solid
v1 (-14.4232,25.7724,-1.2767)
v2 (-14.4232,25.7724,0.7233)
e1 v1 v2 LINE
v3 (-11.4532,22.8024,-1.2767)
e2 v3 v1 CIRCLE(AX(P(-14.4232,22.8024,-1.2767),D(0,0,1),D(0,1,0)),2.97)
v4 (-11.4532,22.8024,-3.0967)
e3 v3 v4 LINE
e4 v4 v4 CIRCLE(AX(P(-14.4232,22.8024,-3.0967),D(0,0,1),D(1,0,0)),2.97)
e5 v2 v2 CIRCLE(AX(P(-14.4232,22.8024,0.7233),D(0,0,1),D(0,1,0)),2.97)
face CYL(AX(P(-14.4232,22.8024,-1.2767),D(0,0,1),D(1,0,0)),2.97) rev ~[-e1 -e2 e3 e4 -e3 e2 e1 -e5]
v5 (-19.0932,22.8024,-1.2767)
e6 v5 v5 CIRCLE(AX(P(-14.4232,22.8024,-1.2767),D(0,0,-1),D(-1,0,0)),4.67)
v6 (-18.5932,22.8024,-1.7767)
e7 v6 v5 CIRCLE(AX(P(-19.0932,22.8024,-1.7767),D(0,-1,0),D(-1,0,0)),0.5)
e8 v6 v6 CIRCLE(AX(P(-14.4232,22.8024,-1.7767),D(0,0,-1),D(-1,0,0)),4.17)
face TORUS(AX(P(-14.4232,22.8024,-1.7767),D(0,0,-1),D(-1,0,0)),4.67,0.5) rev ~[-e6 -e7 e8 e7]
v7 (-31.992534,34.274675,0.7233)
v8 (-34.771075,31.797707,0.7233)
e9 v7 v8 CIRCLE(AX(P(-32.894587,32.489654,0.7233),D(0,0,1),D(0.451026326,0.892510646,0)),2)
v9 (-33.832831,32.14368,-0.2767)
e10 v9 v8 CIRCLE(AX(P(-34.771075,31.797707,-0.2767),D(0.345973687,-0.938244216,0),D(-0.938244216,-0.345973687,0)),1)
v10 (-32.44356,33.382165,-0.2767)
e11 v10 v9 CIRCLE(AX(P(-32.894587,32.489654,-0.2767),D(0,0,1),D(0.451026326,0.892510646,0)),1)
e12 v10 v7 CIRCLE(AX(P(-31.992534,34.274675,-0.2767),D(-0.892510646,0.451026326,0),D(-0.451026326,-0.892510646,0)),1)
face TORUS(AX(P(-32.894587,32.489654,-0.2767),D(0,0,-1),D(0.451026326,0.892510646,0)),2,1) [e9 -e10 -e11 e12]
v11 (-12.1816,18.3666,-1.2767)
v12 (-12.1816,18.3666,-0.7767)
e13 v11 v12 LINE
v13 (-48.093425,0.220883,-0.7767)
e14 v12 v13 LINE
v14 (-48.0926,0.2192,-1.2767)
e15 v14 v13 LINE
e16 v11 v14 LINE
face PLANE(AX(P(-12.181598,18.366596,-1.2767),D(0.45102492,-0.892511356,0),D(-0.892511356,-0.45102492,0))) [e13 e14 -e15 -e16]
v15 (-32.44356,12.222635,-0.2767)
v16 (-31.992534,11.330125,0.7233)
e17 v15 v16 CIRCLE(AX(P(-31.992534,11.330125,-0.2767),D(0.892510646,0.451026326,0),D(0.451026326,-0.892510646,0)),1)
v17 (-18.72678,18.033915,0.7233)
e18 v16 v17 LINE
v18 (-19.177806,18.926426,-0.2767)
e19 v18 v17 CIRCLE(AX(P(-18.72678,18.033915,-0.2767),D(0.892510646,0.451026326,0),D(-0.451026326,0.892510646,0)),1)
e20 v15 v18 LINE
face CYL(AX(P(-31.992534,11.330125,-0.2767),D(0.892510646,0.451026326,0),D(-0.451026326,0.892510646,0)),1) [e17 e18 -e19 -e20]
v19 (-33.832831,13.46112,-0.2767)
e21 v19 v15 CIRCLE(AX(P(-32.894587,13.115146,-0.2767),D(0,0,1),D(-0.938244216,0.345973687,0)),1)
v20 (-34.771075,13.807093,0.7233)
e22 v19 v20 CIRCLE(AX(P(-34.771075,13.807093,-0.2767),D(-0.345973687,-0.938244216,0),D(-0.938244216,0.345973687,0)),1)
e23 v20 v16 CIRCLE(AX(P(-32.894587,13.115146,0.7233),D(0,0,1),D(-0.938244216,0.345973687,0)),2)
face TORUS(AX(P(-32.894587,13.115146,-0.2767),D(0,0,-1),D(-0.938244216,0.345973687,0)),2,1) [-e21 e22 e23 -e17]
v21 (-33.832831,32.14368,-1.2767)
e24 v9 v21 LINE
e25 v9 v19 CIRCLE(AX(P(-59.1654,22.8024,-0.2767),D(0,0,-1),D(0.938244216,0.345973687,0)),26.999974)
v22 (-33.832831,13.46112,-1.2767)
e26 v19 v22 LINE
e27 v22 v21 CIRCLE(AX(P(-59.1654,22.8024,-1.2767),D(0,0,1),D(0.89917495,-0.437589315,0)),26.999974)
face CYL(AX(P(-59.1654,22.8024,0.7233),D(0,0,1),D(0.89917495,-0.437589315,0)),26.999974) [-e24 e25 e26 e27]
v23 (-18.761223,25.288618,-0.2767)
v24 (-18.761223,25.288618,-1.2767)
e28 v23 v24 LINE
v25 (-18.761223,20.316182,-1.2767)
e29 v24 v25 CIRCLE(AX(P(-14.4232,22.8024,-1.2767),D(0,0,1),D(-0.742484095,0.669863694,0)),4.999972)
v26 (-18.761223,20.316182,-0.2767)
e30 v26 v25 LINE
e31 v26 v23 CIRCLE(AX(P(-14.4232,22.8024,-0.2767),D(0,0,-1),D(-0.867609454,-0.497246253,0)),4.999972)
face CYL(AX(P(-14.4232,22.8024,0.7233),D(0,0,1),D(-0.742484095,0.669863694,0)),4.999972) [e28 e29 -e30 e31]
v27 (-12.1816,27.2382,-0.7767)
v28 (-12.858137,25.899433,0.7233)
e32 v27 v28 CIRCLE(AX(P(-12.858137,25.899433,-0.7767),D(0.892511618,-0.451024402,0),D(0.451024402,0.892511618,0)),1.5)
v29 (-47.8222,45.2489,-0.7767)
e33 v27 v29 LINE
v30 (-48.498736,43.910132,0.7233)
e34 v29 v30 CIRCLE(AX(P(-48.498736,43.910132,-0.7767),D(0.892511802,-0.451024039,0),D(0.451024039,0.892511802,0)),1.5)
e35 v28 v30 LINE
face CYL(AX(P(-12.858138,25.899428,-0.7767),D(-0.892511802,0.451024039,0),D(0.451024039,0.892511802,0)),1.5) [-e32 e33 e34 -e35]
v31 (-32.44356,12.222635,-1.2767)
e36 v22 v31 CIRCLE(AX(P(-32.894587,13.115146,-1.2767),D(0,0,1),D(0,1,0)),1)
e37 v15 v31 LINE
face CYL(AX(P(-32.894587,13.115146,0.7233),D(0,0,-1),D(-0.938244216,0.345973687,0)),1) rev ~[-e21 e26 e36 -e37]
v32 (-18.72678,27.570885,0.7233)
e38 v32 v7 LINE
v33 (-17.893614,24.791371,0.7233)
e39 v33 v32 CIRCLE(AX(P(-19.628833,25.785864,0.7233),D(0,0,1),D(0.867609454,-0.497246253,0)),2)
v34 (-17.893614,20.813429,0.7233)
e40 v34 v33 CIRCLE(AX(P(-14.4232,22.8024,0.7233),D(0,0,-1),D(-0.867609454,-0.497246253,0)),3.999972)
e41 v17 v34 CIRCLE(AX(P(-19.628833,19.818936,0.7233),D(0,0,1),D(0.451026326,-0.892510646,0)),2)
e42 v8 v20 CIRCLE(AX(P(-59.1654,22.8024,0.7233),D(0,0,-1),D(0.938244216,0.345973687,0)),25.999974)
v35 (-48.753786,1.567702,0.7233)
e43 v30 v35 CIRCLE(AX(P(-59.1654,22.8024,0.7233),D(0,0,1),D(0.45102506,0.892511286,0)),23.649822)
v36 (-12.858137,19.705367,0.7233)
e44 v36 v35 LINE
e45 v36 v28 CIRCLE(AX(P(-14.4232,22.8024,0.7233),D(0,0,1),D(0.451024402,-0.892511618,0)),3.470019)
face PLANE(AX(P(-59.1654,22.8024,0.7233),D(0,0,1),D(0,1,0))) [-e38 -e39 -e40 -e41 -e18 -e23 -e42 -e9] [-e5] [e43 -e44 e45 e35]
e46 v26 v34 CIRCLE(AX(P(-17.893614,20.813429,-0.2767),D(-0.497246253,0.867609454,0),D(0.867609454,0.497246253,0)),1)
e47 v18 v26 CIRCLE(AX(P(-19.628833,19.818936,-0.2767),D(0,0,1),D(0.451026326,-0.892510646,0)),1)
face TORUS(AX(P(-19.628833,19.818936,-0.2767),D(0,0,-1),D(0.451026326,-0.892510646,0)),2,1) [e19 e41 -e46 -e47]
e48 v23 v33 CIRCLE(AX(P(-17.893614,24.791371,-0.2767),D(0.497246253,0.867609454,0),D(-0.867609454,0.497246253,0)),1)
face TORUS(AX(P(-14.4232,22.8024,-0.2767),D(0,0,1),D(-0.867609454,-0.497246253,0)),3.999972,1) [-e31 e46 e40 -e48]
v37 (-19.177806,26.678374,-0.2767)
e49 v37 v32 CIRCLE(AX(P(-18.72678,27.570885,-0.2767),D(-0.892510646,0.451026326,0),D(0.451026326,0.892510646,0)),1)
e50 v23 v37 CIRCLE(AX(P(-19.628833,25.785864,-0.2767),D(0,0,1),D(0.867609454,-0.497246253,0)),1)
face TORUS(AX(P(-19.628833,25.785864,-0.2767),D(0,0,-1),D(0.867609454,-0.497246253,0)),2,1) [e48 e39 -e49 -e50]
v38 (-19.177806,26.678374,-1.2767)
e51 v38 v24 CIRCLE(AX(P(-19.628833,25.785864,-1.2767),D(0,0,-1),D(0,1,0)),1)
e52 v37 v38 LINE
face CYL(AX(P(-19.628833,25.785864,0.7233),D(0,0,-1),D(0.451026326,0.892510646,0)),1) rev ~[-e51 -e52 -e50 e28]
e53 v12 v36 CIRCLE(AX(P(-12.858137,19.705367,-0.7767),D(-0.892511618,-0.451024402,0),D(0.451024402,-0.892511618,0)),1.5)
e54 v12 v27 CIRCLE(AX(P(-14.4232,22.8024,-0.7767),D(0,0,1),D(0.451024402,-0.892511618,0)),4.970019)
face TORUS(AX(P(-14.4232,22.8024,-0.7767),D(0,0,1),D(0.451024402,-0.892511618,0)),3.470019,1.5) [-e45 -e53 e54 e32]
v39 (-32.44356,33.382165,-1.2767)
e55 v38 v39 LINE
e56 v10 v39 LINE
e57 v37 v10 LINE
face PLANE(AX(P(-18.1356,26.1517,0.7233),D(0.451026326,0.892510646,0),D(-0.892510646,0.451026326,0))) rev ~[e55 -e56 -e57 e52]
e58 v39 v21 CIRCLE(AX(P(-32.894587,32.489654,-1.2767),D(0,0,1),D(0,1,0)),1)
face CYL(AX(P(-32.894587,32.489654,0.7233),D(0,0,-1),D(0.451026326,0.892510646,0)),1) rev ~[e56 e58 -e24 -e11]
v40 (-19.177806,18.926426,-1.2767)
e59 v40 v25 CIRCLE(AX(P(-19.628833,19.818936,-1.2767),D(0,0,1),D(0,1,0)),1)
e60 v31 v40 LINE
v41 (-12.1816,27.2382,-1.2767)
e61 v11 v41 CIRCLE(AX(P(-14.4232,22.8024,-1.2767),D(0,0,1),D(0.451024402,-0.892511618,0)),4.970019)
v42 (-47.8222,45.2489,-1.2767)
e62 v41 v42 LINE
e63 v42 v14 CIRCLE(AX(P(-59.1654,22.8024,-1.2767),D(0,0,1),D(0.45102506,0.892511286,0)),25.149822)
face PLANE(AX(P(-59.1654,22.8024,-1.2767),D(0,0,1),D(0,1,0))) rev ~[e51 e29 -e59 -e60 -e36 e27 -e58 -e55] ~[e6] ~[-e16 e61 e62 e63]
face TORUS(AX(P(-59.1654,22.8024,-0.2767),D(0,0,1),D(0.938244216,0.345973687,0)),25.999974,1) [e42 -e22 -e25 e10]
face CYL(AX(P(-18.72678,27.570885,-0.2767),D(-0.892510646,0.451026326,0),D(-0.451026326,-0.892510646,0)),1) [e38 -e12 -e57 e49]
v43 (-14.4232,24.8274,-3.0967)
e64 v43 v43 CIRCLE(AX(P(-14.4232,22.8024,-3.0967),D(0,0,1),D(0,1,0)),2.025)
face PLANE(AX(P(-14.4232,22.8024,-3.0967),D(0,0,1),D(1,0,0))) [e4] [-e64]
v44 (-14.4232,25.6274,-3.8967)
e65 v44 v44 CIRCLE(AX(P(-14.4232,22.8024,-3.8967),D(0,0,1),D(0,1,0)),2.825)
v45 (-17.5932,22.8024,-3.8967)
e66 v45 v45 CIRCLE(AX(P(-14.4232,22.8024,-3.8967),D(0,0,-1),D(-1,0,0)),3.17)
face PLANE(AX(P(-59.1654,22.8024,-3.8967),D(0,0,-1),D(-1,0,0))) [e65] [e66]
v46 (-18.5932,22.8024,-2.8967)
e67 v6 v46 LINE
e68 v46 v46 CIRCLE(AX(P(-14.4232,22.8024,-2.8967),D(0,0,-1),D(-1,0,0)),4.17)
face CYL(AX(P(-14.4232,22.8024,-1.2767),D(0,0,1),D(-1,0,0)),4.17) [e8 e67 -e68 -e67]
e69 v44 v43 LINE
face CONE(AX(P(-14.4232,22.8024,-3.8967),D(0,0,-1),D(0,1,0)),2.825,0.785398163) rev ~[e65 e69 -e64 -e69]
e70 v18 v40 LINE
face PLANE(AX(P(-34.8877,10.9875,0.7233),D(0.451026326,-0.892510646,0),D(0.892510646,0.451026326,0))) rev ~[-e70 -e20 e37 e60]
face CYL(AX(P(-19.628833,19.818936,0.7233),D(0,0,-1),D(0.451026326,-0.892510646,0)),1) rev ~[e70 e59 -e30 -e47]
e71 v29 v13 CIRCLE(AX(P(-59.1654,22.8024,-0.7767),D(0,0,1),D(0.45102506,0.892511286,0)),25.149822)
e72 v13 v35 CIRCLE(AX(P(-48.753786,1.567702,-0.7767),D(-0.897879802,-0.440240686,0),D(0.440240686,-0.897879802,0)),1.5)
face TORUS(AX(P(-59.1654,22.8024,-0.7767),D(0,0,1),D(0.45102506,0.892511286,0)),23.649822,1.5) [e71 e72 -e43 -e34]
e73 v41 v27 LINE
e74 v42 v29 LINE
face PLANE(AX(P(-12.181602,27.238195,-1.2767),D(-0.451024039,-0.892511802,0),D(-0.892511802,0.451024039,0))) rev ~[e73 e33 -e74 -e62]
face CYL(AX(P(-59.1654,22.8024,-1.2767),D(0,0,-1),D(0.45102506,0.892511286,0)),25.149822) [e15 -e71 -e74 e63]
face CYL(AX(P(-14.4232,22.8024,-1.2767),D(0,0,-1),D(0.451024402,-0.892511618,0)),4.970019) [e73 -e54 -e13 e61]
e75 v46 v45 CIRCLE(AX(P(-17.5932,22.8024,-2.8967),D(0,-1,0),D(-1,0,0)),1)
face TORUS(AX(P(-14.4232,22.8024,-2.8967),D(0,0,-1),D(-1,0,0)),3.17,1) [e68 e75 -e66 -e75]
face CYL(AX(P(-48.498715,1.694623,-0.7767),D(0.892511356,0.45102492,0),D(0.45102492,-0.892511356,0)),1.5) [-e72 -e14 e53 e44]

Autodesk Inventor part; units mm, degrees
ref_plane "YZ Plane" through (0, 0, 0) normal (1, 0, 0) x (0, 1, 0)
ref_plane "XZ Plane" through (0, 0, 0) normal (0, 1, 0) x (-1, 0, 0)
ref_plane "XY Plane" through (0, 0, 0) normal (0, 0, 1) x (1, 0, 0)
ref_plane "Work Plane1" through (0, 0, 0) normal (0, 0, -1) x (-1, 0, 0)
ref_plane "Work Plane3" through (-59.1654, 22.8024, -1.2767) normal (0, 0, 1) x (0, 1, 0)
sketch "Sketch4" plane through (-59.1654, 22.8024, -1.2767) normal (0, 0, 1) x (0, 1, 0)
  line L0 (0, 0.2578) -> (0, -48.4285) construction
  line L1 (-4.3051, -44.7422) -> (4.9106, -44.7422) construction
  circle A0 centre (0, -44.7422) radius 2.97
  circle A1 centre (0, 0) radius 25.1499 construction
  arc A2 (-4.4358, -46.9838) -> (4.4358, -46.9838) centre (0, -44.7422) ccw
  line L2 (0, -55.7616) -> (-22.5832, -11.0728)
  line L3 (0, -55.7616) -> (22.4465, -11.3432)
  arc A3 (22.4465, -11.3432) -> (-22.4465, -11.3432) centre (0, 0) ccw
  line L4 (0, 0) -> (0, -25.1499) construction
  line L5 (0, -41.7722) -> (0, -73.1545) construction
  point P0 (-22.8024, -59.1654)
  dimension "d9" = 5.94
  dimension "d8" = 45
  dimension "d10" = 2
extrude "Extrusion2" add sketch "Sketch4" along normal blind 2 contours L2 A3 L3 A2
fillet "Fillet2" radius 1.5 4 edges at (-9.4532, 22.8024, 0.7233) (-30.0019, 36.2436, 0.7233) (-84.3153, 22.8024, 0.7233) (-30.0019, 9.3612, 0.7233)
sketch "Sketch5" plane through (-59.1654, 22.8024, 0.7233) normal (0, 0, 1) x (1, 0, 0)
  line L0 (41.0298, 3.3493) -> (24.2777, 11.8149)
  line L1 (24.2777, -11.8149) -> (41.0298, -3.3493)
  line L2 (11.3432, -22.4465) -> (46.9838, -4.4358) projected
  line L3 (46.9838, 4.4358) -> (11.3432, 22.4465) projected
  arc A0 (46.9838, -4.4358) -> (46.9838, 4.4358) centre (44.7422, 0) ccw projected
  circle A1 centre (44.7422, 0) radius 2.97 projected
  arc A2 (46.3073, -3.097) -> (46.3073, 3.097) centre (44.7422, 0) ccw projected
  line L4 (10.6667, 21.1078) -> (46.3073, 3.097) projected
  arc A3 (10.6667, 21.1078) -> (10.6667, -21.1078) centre (0, 0) ccw projected
  line L5 (46.3073, -3.097) -> (10.6667, -21.1078) projected
  line L6 (-0.2578, 0) -> (48.4285, 0) construction
  arc A4 (24.2777, -11.8149) -> (24.2777, 11.8149) centre (0, 0) ccw
  arc A5 (41.0298, 3.3493) -> (41.0298, -3.3493) centre (44.7422, 0) ccw
  line L7 (48.7042, -0.0038) -> (-50.8727, 0.004) construction
  point P0 (59.1654, -22.8024)
  point P1 (39.7422, -4)
  point P2 (39.7422, 4)
  point P3 (26.5473, 10.668)
  point P4 (26.5473, -10.668)
  dimension "d25" = 27
  dimension "d27" = 5
extrude "Extrusion3" cut sketch "Sketch5" against normal through all contours A5 L1 A4 L0
fillet "Fillet4" radius 1 4 edges at (-18.1356, 26.1517, -0.2767) (-18.1356, 19.4531, -0.2767) (-34.8877, 34.6173, -0.2767) (-34.8877, 10.9875, -0.2767)
fillet "Fillet5" radius 1 8 edges at (-33.56, 12.3687, 0.7233) (-32.1654, 22.8024, 0.7233) (-33.56, 33.2361, 0.7233) (-25.8107, 30.0303, 0.7233) (-18.6709, 26.073, 0.7233) (-19.4232, 22.8024, 0.7233) (-18.6709, 19.5318, 0.7233) (-25.8107, 15.5745, 0.7233)
sketch "Sketch6" plane through (-59.1654, 22.8024, -1.2767) normal (0, 0, -1) x (-1, 0, 0)
  line L0 (-47.2622, 0) -> (-42.2222, 0) construction
  circle A0 centre (-44.7422, 0) radius 4.17
  arc A1 (-46.9838, 4.4358) -> (-46.9838, -4.4358) centre (-44.7422, 0) ccw construction
  point P0 (-59.1654, -22.8024)
  dimension "d30" = 0.8
extrude "Extrusion4" add sketch "Sketch6" along normal blind 2.62
fillet "Fillet6" radius 1 1 edges at (-10.2532, 22.8024, -3.8967)
sketch "Sketch7" plane through (-14.4232, 22.8024, -1.2767) normal (0, 0, 1) x (1, 0, 0)
  circle A0 centre (0, 0) radius 2.97 projected
  point P0 (14.4232, -22.8024)
extrude "Extrusion5" cut sketch "Sketch7" against normal blind 1.82
sketch "Sketch8" plane through (-14.4232, 22.8024, -3.8967) normal (0, 0, -1) x (-1, 0, 0)
  circle A0 centre (0, 0) radius 1.3 projected
  point P0 (-14.4232, -22.8024)
hole "Hole1" at (-14.4232, 22.8024, -3.8967) direction (0, 0, 1) diameter 2.86 depth 1.82 countersink diameter 5.65 countersink angle 90
fillet "Fillet7" radius 0.5 1 edges at (-10.2532, 22.8024, -1.2767)
properties part number "trapdoor_servo" material "PET Plastic"
